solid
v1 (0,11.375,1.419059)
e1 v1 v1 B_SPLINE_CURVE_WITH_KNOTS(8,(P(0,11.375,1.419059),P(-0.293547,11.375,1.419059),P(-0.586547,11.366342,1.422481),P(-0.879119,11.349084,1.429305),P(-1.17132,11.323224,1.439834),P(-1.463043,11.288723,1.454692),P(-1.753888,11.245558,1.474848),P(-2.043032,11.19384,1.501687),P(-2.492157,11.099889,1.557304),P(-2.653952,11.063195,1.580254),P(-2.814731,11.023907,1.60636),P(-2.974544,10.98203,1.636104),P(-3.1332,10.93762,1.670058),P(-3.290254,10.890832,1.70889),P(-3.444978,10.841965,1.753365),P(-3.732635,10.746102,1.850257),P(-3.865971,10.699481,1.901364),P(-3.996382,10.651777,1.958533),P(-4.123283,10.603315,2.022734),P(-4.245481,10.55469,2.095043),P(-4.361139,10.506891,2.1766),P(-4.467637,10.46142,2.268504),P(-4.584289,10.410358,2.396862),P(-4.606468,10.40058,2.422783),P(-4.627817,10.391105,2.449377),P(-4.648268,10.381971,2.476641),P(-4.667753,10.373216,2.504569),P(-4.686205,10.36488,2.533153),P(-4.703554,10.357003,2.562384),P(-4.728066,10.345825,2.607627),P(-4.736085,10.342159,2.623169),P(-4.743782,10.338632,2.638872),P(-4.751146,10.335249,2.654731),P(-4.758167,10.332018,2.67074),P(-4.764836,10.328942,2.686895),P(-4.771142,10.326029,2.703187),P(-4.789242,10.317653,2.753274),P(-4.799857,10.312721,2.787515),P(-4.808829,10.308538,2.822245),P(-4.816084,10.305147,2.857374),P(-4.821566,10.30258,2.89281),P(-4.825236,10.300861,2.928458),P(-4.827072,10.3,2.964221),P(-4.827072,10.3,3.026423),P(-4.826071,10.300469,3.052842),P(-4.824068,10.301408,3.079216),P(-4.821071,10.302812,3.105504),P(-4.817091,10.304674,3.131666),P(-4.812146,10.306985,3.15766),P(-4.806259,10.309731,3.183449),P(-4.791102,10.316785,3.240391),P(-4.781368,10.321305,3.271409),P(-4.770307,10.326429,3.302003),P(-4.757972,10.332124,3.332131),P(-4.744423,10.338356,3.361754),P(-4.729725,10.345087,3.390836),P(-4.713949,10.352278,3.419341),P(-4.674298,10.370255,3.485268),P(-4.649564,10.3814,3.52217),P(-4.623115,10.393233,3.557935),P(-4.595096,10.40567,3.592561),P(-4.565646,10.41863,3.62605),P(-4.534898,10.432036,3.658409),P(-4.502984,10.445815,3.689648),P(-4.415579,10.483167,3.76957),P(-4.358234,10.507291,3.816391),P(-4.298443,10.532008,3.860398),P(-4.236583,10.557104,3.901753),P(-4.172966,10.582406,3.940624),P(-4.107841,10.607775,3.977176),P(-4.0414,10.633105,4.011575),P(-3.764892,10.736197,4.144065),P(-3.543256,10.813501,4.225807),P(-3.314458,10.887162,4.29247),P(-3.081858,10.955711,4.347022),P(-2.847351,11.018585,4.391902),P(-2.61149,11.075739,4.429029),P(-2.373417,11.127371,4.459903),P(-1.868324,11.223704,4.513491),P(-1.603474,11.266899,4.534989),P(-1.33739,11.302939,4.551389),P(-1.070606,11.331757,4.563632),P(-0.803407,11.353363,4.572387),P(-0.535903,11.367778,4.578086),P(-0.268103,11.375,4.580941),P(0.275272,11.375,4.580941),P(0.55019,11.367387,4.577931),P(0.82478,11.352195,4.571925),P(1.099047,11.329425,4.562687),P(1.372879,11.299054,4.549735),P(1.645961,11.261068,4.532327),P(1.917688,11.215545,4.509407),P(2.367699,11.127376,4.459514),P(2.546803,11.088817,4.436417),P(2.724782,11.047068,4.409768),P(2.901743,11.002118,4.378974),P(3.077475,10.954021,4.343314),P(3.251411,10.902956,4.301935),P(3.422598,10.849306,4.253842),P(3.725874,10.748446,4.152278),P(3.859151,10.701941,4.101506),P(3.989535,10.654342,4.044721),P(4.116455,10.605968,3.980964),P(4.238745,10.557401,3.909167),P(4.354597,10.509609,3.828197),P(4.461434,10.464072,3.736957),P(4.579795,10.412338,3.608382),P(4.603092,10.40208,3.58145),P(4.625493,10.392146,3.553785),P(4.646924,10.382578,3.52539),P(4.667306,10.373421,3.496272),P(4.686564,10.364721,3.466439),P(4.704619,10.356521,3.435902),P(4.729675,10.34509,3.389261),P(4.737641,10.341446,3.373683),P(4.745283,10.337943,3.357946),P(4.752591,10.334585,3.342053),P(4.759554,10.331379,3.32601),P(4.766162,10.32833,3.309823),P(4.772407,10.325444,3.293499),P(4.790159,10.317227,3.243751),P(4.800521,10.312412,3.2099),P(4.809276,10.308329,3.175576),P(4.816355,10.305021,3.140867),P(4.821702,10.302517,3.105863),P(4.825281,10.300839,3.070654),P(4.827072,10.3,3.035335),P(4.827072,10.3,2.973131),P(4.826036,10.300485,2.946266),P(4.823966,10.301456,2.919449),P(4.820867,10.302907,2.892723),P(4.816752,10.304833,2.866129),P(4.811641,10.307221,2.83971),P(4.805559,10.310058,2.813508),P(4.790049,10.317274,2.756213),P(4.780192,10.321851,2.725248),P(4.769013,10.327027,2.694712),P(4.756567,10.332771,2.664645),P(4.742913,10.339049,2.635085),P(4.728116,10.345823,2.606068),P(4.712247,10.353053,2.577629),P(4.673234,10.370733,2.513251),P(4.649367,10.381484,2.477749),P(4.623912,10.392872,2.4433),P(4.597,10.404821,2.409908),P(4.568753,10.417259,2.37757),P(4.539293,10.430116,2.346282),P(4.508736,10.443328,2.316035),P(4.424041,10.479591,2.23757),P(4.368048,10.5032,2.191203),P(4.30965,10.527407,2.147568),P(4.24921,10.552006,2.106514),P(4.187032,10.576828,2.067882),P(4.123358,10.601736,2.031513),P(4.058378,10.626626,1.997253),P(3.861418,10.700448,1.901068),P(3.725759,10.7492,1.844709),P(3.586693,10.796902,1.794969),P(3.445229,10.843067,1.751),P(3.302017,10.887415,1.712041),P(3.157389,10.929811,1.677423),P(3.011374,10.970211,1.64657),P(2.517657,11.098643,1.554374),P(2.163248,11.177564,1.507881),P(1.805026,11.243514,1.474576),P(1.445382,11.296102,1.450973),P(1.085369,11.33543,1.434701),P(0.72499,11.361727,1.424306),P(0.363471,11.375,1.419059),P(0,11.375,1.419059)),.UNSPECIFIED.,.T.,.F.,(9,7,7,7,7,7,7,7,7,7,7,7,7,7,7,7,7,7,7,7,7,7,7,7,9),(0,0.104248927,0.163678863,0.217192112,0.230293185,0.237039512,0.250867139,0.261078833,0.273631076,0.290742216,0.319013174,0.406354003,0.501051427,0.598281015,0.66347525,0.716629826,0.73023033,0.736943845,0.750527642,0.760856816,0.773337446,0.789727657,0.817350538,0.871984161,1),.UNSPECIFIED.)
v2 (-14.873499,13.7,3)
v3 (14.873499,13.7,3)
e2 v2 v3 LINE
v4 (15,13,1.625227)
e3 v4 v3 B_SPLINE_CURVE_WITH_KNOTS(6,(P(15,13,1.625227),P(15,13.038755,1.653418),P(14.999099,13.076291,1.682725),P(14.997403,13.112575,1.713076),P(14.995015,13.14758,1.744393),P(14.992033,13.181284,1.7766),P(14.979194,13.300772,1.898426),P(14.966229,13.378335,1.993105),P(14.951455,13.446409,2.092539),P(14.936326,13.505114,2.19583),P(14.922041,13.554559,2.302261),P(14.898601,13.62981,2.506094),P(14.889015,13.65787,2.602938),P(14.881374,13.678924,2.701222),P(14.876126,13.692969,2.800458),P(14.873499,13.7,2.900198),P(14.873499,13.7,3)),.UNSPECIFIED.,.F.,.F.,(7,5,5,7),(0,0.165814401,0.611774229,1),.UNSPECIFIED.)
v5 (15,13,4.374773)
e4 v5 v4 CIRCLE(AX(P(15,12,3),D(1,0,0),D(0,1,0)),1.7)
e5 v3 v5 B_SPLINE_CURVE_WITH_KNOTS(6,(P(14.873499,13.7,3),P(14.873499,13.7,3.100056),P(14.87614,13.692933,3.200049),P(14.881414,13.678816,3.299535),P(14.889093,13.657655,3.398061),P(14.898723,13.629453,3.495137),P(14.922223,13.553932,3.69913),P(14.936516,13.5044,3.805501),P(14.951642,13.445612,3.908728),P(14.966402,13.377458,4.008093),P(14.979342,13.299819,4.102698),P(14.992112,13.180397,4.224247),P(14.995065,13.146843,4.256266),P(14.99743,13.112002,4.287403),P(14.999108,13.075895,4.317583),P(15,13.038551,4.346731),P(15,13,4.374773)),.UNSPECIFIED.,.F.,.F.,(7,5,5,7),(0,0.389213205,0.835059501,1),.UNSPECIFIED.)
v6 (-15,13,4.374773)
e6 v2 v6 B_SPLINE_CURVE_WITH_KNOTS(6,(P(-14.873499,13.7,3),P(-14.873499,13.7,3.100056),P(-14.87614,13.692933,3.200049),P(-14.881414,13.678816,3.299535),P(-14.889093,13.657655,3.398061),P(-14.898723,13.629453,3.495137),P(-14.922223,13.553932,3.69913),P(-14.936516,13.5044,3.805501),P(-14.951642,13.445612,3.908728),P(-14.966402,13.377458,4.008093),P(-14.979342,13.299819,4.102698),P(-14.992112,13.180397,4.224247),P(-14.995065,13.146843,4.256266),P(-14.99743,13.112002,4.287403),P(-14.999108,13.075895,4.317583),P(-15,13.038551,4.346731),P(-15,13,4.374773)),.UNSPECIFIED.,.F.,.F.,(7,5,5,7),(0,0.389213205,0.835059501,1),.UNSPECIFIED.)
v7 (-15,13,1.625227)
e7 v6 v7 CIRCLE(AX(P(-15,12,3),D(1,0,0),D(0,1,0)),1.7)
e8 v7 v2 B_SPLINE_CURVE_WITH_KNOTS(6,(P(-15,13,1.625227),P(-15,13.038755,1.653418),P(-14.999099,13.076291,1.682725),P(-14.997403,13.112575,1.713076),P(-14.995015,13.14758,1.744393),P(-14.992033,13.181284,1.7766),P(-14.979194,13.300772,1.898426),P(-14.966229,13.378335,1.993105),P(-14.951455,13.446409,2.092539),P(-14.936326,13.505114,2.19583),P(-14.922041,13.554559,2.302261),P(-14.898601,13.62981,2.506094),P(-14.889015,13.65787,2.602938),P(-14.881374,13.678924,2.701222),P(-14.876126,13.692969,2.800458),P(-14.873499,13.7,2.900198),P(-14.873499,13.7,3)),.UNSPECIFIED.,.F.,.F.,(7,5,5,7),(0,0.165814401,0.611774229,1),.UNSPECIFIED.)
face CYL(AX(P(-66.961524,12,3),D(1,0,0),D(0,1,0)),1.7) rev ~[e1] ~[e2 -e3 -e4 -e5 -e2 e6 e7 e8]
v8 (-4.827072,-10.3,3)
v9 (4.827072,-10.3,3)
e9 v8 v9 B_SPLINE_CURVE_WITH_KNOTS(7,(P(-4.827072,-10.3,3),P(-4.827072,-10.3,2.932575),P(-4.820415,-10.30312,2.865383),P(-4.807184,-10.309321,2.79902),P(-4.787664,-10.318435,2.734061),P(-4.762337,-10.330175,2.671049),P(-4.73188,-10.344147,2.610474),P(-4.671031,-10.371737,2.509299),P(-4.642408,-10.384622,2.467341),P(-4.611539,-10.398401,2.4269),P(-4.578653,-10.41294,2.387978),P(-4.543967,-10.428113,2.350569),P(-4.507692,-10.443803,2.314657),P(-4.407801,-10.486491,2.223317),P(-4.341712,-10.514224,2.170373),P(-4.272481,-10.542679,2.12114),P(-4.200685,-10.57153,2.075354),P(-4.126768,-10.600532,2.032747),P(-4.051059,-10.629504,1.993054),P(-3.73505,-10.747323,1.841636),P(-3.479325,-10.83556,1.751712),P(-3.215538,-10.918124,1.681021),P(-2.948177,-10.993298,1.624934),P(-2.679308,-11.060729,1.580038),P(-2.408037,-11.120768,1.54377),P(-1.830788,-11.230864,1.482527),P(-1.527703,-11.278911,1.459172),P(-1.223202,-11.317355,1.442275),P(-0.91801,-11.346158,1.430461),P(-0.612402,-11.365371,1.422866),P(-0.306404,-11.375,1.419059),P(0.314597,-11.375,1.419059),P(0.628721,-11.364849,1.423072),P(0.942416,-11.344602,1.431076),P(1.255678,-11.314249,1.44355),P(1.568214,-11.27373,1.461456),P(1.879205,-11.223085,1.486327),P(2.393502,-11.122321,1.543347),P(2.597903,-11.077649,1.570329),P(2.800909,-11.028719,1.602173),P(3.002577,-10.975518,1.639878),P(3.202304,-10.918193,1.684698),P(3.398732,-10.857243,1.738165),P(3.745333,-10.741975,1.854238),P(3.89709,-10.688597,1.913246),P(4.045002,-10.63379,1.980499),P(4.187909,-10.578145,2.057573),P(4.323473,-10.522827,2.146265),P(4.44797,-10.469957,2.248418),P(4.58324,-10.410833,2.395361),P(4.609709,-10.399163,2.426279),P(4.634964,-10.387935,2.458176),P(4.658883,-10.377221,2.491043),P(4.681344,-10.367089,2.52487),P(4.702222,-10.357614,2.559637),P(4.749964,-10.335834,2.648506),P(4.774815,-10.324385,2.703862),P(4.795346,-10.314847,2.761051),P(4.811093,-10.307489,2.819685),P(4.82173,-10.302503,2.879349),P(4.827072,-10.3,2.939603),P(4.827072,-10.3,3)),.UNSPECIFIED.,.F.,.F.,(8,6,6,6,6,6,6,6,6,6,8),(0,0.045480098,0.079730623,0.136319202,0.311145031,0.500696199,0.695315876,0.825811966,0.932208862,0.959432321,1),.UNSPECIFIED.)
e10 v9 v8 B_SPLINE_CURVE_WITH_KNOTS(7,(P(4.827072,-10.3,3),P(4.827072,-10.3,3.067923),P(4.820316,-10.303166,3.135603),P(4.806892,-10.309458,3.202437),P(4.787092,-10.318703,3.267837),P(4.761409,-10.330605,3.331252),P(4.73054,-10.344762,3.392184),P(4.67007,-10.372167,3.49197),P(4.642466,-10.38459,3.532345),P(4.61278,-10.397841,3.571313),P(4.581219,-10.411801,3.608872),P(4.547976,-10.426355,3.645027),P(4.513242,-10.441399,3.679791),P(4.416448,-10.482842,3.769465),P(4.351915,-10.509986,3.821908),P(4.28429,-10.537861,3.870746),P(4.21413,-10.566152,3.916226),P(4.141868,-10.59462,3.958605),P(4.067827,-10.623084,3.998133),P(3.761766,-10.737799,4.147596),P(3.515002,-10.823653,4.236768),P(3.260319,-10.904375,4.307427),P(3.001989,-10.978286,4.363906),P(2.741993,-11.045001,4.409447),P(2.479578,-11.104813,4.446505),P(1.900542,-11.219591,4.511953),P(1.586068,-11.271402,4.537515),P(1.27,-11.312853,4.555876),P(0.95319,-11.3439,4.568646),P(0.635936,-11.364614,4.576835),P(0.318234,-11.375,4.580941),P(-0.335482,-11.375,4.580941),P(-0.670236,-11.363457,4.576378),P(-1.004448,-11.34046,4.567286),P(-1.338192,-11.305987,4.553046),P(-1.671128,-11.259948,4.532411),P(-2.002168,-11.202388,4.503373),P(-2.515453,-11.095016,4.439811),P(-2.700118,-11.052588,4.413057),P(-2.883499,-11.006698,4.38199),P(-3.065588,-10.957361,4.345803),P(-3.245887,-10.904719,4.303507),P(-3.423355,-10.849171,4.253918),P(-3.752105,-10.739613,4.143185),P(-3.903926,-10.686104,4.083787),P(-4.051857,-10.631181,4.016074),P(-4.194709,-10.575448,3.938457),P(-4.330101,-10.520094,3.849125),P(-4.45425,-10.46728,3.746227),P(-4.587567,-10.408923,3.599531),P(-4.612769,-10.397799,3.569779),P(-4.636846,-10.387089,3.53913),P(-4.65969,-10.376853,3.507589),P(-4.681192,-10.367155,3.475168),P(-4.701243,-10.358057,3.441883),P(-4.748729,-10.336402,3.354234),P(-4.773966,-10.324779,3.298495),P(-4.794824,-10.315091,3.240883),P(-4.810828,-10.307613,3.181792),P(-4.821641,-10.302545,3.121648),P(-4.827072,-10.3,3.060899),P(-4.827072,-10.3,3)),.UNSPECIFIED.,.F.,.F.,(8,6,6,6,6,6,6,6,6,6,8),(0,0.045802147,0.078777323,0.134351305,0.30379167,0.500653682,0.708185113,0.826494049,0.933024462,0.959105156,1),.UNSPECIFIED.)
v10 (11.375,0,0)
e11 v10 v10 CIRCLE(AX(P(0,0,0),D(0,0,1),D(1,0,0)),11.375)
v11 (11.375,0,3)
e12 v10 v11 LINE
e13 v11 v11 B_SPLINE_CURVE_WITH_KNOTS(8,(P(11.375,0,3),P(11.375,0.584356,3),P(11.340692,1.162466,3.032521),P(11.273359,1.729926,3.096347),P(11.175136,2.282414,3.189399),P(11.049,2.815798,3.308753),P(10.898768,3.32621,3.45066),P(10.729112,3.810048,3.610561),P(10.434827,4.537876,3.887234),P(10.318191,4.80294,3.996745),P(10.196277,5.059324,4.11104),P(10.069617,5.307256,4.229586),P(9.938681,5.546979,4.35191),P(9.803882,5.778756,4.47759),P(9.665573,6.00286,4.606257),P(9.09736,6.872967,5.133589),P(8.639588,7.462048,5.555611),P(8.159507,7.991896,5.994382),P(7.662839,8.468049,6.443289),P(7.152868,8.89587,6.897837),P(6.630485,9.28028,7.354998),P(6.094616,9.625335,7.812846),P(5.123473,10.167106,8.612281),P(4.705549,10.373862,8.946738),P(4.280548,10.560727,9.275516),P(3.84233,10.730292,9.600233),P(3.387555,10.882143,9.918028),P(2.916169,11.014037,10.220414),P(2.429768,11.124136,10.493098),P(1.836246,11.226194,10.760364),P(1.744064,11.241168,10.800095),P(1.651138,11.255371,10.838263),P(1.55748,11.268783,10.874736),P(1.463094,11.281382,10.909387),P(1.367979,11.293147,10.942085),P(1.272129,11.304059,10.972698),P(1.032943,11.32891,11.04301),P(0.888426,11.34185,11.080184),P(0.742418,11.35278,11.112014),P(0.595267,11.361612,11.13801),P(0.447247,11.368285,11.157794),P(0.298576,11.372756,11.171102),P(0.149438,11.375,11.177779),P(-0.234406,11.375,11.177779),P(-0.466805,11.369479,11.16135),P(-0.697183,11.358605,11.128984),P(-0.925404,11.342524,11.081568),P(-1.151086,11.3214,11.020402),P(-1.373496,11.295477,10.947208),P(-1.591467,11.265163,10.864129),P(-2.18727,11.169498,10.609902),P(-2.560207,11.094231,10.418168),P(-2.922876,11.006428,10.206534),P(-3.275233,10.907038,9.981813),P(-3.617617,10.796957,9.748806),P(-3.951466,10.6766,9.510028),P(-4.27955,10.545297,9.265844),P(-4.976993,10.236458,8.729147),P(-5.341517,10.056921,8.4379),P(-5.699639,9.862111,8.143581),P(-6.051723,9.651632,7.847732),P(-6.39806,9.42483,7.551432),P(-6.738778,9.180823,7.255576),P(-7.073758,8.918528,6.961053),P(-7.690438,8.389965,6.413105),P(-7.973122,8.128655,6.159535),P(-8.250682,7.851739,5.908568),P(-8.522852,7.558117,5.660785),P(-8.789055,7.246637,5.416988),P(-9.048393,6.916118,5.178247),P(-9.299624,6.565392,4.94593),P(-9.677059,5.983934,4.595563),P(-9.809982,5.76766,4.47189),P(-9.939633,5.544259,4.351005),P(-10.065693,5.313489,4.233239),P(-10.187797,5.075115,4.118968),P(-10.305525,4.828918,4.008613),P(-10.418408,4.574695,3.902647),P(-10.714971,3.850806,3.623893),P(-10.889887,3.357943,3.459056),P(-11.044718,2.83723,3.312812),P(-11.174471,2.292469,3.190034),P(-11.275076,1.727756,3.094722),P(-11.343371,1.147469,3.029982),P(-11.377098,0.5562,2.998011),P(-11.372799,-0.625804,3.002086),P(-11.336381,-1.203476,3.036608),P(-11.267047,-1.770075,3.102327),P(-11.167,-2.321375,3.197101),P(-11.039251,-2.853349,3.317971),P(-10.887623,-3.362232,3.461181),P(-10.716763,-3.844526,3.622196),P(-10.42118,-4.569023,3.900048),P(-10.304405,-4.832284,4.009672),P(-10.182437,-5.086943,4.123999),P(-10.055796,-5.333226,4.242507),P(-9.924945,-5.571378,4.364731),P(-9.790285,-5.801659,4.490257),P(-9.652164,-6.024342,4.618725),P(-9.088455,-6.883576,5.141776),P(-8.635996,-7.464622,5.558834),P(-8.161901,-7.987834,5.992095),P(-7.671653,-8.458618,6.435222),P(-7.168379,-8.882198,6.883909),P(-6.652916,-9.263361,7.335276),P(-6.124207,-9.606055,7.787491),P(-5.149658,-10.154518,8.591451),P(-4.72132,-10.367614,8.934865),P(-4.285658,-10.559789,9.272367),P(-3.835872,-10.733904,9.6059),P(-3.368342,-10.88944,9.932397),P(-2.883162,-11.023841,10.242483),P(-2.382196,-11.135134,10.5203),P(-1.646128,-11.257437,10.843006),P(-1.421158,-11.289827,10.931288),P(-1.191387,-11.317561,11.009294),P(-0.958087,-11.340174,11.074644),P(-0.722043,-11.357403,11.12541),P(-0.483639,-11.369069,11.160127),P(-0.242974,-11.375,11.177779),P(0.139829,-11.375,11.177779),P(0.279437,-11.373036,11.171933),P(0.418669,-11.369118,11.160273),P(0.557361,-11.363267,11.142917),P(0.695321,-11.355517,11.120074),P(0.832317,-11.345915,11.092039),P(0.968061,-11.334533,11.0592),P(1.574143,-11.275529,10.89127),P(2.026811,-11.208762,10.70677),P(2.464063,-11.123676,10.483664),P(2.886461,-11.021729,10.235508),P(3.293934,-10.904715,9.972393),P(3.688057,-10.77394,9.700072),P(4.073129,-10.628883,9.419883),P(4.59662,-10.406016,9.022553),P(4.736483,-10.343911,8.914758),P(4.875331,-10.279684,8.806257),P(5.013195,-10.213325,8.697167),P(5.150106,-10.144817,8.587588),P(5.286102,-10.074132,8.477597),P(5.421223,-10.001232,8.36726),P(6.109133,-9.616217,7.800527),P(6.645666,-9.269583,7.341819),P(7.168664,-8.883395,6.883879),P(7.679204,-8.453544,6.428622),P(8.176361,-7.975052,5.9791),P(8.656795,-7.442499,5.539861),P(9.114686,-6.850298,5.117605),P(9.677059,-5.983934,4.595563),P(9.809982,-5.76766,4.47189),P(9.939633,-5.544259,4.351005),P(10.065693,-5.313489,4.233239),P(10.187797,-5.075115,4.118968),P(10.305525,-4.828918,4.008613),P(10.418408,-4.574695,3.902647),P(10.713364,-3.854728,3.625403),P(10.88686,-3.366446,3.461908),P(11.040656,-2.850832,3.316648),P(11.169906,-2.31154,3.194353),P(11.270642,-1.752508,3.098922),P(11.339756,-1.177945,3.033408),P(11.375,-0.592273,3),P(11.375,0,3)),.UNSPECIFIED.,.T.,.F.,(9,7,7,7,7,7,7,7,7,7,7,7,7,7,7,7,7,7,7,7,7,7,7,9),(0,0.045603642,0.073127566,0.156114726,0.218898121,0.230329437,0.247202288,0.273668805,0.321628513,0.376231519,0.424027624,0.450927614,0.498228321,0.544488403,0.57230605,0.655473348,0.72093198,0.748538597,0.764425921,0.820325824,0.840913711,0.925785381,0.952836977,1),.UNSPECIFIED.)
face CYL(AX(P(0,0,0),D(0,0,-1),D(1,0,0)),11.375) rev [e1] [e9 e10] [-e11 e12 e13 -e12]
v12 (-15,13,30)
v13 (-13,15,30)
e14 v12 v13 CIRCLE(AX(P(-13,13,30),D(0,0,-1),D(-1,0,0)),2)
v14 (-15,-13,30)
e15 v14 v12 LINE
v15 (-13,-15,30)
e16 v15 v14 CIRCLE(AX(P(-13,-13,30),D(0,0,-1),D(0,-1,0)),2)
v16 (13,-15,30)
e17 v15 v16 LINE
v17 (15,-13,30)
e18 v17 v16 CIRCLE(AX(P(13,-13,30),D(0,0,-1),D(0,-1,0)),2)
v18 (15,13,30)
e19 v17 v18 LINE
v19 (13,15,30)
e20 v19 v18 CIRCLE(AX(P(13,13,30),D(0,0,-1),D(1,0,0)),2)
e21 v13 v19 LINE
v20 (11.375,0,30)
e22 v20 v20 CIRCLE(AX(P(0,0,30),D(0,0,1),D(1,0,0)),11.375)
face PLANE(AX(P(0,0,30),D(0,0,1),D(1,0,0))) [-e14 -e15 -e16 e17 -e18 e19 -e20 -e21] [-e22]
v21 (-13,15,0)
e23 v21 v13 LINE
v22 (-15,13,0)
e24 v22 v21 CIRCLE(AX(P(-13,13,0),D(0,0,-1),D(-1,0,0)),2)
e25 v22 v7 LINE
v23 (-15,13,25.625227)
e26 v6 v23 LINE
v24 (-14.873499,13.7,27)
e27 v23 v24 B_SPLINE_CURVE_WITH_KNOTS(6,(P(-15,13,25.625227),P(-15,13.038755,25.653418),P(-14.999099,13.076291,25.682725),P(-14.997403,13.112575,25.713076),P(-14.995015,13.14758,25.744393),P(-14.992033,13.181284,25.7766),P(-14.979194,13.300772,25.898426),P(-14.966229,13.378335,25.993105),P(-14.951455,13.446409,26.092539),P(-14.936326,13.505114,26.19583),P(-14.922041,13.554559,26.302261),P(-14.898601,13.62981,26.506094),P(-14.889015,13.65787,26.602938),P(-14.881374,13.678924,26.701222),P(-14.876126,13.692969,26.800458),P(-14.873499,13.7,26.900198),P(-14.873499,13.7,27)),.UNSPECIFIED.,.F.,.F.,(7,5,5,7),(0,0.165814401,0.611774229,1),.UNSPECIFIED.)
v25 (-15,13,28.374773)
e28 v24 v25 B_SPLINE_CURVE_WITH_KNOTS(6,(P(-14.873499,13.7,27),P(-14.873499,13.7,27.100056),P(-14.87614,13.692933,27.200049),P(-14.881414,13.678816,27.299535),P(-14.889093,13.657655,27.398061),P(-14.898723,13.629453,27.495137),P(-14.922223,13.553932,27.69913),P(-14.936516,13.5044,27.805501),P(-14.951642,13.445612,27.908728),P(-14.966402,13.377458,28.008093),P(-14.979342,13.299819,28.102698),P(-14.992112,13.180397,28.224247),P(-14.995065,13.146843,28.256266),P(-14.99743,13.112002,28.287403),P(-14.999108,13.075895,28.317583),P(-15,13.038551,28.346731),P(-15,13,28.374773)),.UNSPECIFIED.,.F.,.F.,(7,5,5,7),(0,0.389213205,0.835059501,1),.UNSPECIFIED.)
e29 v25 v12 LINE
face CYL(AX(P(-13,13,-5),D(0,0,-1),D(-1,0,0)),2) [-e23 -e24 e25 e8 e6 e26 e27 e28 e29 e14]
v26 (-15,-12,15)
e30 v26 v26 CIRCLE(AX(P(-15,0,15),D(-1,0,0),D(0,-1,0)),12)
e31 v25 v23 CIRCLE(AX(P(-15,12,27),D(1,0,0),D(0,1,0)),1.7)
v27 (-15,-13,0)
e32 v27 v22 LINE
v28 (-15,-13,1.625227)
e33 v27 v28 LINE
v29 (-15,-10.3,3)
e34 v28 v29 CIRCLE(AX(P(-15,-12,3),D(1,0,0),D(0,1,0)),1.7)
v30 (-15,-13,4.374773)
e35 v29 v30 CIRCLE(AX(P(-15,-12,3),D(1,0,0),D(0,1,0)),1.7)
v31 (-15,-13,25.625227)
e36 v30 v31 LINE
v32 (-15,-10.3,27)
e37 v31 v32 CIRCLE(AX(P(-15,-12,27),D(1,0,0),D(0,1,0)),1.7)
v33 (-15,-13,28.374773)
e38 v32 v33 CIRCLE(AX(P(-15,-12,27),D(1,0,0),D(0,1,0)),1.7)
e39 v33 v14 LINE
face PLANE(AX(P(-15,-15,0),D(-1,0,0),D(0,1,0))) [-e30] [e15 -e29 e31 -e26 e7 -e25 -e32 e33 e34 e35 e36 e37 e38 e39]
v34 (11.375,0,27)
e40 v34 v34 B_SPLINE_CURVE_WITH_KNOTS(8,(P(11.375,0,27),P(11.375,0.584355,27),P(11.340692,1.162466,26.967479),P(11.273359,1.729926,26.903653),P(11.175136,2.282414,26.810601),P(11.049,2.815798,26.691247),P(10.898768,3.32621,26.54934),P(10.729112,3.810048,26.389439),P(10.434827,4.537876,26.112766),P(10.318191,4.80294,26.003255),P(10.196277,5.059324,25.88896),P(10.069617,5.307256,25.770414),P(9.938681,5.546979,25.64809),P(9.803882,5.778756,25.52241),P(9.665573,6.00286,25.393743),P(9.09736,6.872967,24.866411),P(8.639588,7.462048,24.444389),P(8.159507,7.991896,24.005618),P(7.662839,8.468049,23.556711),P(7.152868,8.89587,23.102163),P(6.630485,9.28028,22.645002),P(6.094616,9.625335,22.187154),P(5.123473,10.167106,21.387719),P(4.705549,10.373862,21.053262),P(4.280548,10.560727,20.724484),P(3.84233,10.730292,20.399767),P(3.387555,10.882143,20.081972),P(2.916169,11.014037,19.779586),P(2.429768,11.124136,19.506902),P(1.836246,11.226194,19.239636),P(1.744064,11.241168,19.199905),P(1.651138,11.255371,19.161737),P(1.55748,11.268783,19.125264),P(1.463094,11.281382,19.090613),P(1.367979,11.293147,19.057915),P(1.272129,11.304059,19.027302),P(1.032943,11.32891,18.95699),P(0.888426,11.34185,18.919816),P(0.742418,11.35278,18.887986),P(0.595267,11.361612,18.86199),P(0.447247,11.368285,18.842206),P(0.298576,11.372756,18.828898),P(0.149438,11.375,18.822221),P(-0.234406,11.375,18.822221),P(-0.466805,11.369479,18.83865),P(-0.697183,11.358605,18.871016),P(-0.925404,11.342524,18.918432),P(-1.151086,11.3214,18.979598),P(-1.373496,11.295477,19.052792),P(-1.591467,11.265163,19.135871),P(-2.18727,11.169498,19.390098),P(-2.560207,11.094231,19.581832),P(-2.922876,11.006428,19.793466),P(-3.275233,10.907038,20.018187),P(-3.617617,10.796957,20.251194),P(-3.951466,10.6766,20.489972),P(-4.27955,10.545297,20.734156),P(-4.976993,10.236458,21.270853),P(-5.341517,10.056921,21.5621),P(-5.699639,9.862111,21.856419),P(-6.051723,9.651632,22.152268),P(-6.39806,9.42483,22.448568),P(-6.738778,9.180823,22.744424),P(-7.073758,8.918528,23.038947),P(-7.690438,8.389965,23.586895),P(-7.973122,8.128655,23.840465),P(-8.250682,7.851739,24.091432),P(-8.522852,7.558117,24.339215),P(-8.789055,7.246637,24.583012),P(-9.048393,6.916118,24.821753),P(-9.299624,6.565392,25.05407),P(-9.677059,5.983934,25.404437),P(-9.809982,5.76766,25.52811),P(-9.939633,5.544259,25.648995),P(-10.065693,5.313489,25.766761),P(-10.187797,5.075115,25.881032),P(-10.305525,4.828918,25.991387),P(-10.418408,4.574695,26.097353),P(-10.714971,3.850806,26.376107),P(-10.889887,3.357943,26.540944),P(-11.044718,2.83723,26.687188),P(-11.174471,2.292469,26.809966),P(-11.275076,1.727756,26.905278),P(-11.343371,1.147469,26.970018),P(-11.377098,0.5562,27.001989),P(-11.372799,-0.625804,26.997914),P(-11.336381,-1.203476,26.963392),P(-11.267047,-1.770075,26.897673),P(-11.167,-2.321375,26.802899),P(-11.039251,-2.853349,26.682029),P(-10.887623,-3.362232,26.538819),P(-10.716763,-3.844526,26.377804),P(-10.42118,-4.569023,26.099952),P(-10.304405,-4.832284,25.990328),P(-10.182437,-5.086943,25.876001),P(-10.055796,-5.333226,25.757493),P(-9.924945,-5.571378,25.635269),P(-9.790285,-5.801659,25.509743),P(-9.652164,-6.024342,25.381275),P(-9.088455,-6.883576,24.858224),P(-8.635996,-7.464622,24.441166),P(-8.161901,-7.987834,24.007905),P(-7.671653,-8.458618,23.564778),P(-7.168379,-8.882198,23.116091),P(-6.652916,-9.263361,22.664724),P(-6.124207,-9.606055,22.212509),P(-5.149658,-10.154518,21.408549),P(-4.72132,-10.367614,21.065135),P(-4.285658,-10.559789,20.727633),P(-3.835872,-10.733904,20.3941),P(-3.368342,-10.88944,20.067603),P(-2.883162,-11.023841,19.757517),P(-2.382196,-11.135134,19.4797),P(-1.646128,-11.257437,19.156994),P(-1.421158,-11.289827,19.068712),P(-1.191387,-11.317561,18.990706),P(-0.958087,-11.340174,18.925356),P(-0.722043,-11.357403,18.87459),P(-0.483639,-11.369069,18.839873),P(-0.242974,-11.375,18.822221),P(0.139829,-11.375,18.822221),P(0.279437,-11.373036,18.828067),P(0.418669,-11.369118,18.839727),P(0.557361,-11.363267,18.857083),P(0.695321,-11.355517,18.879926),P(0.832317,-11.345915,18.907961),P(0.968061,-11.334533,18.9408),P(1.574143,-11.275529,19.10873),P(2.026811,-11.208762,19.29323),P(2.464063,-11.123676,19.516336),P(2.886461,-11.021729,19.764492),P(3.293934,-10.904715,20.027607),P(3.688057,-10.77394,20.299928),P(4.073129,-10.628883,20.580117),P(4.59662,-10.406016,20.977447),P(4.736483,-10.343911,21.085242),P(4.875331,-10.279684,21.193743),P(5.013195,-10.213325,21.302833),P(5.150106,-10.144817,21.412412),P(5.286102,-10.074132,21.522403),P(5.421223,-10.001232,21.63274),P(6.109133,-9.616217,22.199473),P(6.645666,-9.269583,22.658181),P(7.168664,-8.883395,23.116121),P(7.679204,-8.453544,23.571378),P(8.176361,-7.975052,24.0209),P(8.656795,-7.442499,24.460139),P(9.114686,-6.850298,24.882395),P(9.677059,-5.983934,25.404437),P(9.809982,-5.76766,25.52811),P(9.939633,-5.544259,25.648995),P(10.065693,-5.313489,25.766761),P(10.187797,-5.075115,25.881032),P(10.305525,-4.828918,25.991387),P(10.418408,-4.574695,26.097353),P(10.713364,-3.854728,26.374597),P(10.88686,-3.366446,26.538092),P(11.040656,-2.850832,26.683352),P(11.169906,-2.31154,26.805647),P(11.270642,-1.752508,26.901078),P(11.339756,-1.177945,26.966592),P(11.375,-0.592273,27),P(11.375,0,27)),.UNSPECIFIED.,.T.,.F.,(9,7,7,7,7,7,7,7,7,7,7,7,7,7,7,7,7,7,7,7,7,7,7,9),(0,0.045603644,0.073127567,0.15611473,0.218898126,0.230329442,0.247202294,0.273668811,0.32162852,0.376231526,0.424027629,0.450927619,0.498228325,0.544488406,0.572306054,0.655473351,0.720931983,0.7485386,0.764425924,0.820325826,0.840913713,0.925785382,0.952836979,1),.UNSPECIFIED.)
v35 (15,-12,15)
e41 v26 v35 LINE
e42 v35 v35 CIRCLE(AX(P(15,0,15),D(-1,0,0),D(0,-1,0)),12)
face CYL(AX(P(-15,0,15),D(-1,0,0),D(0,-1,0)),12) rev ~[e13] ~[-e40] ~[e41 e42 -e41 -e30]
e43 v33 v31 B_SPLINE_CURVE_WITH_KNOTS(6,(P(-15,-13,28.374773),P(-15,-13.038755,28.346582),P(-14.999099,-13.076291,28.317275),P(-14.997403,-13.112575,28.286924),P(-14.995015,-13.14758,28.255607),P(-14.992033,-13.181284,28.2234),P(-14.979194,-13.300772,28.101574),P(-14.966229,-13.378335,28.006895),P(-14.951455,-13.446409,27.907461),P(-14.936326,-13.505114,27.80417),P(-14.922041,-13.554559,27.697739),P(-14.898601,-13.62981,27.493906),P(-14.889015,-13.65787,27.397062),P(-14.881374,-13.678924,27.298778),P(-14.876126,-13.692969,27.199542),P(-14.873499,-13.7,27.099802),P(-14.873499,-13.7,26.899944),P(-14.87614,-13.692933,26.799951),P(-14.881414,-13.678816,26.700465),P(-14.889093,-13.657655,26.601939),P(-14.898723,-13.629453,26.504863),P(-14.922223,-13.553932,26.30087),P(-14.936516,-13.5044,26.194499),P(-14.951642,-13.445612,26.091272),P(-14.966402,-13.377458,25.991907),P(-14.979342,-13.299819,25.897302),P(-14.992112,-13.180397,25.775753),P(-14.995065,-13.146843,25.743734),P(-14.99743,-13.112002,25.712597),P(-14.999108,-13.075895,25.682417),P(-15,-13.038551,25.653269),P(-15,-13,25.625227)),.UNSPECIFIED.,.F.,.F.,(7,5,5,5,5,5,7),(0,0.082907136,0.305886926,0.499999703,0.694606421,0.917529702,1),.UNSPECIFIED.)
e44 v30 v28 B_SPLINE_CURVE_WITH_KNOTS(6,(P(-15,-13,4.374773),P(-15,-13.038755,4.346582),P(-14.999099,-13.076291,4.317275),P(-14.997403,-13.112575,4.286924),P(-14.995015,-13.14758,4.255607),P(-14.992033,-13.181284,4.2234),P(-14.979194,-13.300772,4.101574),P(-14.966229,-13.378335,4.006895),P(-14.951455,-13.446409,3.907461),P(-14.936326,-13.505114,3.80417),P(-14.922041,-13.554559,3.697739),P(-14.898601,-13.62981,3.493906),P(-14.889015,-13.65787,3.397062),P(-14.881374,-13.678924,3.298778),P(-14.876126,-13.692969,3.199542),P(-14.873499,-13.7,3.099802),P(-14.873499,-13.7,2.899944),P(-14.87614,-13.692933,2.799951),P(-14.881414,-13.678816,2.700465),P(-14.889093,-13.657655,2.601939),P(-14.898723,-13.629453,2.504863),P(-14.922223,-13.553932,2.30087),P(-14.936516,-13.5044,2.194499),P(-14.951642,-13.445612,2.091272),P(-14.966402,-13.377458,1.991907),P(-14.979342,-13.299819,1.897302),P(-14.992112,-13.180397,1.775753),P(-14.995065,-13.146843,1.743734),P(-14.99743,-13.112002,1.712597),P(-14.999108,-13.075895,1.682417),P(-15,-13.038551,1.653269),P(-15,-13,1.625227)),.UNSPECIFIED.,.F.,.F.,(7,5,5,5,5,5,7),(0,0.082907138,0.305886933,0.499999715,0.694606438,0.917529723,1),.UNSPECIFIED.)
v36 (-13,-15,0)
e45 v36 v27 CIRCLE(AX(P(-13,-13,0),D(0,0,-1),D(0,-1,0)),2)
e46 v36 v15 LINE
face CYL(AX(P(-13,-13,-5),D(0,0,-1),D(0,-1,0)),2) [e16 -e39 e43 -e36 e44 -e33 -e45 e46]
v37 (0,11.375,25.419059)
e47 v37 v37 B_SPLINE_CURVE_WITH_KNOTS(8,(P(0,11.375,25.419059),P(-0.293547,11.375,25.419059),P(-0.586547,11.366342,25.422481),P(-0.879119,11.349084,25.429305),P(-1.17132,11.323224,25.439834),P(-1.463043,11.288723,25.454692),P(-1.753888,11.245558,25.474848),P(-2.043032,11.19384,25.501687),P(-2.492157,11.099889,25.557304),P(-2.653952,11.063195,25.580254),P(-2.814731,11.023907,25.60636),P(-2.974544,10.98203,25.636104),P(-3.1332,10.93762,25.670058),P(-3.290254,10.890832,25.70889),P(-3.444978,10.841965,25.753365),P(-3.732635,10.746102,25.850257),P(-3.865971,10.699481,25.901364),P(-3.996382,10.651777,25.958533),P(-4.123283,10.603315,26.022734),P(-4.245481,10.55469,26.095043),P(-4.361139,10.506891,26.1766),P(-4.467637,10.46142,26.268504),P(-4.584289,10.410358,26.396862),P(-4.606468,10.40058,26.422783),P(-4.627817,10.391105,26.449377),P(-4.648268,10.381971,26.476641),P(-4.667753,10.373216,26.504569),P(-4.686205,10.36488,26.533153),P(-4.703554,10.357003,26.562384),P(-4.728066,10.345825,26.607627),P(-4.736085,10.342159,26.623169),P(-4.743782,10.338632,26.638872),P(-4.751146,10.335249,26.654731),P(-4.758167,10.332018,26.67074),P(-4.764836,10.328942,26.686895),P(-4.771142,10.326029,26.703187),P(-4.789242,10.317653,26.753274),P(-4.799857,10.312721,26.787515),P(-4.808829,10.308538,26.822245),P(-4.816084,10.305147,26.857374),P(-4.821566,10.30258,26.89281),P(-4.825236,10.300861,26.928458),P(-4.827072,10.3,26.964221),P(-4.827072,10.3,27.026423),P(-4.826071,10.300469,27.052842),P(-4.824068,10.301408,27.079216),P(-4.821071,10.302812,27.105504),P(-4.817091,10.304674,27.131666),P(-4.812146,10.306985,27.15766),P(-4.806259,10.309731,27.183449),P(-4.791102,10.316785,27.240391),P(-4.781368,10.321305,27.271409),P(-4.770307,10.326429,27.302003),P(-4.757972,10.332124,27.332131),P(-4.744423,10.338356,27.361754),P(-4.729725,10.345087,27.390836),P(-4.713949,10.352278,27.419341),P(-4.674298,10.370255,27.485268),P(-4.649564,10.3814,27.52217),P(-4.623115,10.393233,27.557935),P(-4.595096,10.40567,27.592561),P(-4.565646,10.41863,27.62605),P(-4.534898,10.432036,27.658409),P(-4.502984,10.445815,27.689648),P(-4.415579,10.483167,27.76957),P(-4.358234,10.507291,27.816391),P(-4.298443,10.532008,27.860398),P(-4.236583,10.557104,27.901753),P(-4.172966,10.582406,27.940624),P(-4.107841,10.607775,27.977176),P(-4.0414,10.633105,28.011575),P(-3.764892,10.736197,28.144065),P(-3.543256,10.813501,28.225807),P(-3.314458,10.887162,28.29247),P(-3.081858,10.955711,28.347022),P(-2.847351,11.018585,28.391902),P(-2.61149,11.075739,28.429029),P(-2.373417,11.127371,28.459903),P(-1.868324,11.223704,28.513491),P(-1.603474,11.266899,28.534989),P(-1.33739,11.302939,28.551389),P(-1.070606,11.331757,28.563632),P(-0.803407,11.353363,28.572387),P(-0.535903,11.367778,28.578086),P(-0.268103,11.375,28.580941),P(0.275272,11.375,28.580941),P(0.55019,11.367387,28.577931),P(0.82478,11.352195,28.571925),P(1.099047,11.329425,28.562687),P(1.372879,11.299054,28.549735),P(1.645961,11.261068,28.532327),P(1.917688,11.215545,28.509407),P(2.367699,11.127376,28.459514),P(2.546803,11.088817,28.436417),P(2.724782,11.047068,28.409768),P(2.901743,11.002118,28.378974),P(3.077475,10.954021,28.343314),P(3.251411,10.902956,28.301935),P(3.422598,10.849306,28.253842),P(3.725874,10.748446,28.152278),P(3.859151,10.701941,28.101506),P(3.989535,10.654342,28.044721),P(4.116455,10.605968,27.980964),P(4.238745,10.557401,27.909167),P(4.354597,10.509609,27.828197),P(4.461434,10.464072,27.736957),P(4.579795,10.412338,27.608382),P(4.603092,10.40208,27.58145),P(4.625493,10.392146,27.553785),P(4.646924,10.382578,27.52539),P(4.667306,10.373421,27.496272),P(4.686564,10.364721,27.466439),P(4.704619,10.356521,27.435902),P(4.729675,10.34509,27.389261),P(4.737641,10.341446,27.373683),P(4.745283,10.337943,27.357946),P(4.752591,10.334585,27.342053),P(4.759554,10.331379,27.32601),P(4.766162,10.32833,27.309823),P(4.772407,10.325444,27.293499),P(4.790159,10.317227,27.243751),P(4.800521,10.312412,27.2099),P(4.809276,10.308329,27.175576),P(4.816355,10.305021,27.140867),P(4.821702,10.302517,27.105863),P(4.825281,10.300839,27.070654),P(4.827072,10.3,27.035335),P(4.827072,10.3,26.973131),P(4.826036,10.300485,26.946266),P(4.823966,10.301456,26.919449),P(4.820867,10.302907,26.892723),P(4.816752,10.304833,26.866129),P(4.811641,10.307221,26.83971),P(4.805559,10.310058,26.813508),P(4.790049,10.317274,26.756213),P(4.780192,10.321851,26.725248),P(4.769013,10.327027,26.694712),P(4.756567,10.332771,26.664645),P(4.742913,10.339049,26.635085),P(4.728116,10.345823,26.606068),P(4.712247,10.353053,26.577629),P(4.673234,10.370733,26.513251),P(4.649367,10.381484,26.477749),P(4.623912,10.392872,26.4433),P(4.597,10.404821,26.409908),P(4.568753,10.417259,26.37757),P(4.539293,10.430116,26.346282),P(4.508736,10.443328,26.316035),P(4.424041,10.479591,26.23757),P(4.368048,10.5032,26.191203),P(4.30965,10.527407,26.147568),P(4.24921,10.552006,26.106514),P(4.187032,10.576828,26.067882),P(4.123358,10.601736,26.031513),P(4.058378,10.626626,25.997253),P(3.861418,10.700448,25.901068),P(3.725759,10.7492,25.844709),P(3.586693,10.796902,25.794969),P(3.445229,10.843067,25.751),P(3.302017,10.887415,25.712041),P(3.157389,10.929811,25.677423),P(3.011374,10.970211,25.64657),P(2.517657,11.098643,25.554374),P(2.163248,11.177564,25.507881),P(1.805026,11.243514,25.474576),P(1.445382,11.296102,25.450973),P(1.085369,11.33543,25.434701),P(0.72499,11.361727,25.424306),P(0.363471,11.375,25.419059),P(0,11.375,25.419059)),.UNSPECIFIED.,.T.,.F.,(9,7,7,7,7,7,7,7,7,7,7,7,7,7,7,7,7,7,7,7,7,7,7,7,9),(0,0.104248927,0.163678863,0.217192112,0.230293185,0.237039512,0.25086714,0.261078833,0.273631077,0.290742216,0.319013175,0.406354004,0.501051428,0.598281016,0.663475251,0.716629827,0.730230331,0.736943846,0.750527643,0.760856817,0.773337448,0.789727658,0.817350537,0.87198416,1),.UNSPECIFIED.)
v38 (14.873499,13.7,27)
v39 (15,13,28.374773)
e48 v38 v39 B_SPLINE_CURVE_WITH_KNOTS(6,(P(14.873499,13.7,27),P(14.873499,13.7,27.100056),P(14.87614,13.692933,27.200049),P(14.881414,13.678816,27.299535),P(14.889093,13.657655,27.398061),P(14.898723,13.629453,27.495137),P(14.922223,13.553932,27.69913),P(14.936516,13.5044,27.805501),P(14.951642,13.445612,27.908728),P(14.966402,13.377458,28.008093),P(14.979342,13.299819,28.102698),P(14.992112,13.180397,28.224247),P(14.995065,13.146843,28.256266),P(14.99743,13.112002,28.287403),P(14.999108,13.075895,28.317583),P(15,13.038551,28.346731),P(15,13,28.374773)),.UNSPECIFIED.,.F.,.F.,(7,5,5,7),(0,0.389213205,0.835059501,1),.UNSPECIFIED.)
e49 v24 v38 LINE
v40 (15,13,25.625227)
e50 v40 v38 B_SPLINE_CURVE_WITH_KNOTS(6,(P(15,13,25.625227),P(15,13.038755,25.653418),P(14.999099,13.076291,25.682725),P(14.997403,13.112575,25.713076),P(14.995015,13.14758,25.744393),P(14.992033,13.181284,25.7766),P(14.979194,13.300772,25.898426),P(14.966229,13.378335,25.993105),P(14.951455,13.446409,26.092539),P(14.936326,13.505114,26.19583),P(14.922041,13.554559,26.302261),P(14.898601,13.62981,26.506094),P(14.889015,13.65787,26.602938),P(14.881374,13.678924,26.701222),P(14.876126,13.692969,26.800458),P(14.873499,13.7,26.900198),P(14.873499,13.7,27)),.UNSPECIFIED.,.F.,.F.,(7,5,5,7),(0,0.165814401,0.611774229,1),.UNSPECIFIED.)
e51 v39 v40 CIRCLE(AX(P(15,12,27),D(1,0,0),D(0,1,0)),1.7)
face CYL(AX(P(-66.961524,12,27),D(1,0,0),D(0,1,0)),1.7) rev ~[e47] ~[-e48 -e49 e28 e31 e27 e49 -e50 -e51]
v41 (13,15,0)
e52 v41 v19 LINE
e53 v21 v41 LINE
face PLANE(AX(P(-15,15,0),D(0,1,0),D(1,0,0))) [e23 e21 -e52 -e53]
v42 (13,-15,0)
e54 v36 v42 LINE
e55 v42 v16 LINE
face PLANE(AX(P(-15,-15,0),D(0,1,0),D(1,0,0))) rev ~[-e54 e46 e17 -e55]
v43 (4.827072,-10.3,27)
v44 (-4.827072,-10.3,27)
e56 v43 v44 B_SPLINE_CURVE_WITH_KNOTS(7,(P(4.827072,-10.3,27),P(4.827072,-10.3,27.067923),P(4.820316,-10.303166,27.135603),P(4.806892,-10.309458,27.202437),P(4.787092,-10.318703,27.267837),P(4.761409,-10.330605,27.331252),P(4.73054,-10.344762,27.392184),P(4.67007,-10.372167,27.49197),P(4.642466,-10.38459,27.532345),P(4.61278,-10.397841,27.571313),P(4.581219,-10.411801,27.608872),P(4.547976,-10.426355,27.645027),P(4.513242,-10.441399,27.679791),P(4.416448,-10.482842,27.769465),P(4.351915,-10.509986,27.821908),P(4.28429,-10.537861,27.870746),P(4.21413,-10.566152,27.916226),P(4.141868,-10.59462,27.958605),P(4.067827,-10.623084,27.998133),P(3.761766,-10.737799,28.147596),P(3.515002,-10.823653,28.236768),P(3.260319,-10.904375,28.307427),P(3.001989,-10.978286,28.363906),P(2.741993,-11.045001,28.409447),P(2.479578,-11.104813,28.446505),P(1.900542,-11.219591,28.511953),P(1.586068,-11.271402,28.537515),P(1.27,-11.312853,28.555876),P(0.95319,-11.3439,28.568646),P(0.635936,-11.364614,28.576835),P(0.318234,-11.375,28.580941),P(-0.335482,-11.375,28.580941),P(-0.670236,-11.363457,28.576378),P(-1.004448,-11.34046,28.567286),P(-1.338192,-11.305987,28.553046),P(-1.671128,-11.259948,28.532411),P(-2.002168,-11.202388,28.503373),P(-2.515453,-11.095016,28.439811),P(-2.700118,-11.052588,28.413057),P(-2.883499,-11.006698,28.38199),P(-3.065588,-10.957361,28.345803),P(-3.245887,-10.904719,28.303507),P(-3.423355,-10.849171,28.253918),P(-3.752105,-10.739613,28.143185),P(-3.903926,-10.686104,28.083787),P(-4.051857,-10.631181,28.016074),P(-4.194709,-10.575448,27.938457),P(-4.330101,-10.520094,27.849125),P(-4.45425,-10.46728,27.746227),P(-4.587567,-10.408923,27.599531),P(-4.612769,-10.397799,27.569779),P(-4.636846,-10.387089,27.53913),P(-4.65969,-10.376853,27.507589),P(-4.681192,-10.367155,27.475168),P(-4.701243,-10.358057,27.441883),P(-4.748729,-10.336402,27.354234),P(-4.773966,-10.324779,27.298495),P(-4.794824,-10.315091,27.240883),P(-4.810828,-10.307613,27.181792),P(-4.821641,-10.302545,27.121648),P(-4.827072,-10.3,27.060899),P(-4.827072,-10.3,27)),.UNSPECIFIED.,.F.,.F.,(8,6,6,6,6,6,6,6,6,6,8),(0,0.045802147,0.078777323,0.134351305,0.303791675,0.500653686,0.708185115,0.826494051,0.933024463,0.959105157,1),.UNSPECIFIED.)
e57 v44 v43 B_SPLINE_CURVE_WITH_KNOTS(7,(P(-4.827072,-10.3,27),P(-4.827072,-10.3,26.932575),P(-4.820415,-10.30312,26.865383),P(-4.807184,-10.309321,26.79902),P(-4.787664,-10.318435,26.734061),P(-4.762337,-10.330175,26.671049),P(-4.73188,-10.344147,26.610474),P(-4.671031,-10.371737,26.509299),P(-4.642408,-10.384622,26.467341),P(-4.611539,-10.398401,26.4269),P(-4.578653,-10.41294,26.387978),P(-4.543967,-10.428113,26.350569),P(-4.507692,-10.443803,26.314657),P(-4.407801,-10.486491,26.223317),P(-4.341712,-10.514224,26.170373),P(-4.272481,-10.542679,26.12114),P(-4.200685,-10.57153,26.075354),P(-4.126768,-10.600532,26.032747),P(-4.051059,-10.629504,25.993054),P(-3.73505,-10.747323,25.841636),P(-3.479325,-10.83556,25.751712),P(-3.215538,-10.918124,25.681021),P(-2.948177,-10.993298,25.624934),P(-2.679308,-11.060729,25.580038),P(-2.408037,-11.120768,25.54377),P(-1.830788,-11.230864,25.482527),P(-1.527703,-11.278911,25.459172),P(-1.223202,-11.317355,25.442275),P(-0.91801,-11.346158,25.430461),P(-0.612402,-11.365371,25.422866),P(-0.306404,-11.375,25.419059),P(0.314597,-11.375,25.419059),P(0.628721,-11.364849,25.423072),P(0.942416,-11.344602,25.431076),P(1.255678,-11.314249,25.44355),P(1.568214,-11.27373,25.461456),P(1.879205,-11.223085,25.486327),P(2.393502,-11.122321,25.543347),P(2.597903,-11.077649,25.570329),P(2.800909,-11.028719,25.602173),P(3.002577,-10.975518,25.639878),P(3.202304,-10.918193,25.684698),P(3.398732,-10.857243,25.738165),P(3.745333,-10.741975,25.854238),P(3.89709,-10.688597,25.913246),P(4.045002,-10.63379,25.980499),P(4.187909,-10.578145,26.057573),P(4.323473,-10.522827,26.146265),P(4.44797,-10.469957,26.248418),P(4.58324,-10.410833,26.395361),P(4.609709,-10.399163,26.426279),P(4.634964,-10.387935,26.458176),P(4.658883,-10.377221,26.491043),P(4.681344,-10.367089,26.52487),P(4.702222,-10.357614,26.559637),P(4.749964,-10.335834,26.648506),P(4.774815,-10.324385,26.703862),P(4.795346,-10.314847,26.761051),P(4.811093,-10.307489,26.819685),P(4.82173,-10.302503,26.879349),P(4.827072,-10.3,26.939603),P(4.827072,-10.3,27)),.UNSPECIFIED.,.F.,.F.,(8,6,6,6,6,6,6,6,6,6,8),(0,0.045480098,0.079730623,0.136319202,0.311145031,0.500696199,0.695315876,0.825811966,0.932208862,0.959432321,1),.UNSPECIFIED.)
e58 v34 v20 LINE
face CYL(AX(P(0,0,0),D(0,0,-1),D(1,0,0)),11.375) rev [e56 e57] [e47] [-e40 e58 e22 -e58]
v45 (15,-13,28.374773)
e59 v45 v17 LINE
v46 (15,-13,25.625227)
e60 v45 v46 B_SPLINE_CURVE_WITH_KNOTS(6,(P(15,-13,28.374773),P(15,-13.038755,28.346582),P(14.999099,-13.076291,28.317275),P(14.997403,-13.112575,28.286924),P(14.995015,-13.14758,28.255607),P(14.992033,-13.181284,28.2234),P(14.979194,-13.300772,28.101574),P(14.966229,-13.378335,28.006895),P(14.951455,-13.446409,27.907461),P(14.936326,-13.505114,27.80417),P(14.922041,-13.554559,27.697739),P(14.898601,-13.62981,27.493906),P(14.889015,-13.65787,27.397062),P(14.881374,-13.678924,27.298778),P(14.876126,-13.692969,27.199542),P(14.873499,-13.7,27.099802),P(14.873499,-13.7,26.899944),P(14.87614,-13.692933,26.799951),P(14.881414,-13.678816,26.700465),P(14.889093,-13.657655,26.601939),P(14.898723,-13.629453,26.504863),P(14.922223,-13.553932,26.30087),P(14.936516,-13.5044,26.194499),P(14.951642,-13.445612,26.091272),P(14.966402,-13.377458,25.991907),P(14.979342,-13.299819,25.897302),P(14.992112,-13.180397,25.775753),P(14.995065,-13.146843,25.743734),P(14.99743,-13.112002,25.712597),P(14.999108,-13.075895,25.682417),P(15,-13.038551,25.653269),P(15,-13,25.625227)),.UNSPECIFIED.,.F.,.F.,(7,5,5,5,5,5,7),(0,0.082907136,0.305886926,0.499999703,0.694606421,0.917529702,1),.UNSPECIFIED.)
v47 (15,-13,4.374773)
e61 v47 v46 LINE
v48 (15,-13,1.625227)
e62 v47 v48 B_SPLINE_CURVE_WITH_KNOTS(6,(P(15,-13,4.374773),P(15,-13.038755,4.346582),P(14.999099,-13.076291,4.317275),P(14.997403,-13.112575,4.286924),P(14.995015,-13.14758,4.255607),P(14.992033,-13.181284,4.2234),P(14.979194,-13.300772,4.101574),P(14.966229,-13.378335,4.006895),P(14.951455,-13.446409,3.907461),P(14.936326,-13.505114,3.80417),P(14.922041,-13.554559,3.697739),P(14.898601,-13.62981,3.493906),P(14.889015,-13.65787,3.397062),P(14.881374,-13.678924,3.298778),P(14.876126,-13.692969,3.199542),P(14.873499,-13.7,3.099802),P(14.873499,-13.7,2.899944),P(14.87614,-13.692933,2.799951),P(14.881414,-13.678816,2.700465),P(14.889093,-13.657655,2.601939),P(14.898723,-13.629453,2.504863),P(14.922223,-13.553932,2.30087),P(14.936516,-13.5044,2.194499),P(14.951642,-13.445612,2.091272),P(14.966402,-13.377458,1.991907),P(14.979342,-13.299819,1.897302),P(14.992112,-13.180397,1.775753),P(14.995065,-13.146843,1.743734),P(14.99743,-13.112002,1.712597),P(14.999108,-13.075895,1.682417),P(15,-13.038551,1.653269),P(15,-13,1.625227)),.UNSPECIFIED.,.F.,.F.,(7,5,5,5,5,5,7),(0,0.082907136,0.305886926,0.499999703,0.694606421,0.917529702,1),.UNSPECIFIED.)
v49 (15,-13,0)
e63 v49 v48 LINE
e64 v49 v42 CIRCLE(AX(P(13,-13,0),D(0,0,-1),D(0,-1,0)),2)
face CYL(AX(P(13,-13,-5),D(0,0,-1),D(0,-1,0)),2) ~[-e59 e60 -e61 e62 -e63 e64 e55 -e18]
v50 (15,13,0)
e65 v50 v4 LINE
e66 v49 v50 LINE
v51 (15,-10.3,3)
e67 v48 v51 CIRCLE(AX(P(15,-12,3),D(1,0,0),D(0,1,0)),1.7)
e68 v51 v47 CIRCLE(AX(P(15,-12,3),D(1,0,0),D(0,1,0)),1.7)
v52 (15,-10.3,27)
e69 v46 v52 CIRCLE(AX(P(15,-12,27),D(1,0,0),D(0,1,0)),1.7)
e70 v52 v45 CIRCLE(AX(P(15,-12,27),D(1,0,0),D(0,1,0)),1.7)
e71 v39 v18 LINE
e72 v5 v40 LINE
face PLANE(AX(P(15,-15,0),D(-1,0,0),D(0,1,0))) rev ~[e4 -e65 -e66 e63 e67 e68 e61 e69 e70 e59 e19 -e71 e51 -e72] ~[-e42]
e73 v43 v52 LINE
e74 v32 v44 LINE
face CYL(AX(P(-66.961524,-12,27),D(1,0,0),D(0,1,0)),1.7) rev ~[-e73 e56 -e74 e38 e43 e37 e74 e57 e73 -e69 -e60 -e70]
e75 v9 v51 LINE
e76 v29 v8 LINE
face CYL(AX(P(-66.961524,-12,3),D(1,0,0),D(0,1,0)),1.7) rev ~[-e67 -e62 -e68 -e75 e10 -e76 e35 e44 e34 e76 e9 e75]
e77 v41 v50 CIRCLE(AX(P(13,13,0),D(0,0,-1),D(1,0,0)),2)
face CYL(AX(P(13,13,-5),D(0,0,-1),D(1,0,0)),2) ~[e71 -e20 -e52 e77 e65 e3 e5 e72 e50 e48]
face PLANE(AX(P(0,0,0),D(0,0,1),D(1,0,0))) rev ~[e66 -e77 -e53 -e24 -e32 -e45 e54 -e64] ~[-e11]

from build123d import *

# Parameters (mm, degrees)
F0_W        = 30
F0_H        = 30
F0_R        = 11.375
F1_DEPTH    = 30
F3_D        = 3.4
F4_T1_DEPTH = 40
F2_R        = 12
F5_DEPTH    = 30.0010001


# Not quite as in the source:
# - a fillet or chamfer that OpenCascade refuses, or shapes differently, is made with other operations: its cross-section is extruded or revolved along the edge and cut away or added


with BuildPart() as f1:
    # F0 (on Top) → F1 (new body)
    with BuildSketch(Plane.XY):
        Rectangle(F0_W, F0_H)
        Circle(F0_R, mode=Mode.SUBTRACT)
    extrude(amount=F1_DEPTH)

    # F3 (through all)
    with Locations(Plane(origin=(-15, 0, 0), x_dir=(0, -1, 0), z_dir=(-1, 0, 0))):
        with Locations((-12, 27), (12, 27), (12, 3), (-12, 3)):
            Hole(F3_D / 2)

    # F4: fillet of radius 2 on 4 edges, made by hand

    # F4_s2 → F4_t1 (cut)
    with BuildSketch(Plane.XY.offset(-5)):
        with BuildLine():
            ThreePointArc((15, 13), (14.4142135624, 14.4142135624), (13, 15))
            Line((13, 15), (15, 15))
            Line((15, 15), (15, 13))
        make_face()
        with BuildLine():
            ThreePointArc((-15, 13), (-14.4142135624, 14.4142135624), (-13, 15))
            Line((-13, 15), (-15, 15))
            Line((-15, 15), (-15, 13))
        make_face()
        with BuildLine():
            ThreePointArc((-13, -15), (-14.4142135624, -14.4142135624), (-15, -13))
            Line((-15, -13), (-15, -15))
            Line((-15, -15), (-13, -15))
        make_face()
        with BuildLine():
            ThreePointArc((13, -15), (14.4142135624, -14.4142135624), (15, -13))
            Line((15, -13), (15, -15))
            Line((15, -15), (13, -15))
        make_face()
    extrude(amount=F4_T1_DEPTH, mode=Mode.SUBTRACT)

    # F2 (on face) → F5 (cut, through all)
    with BuildSketch(Plane(origin=(-15, 0, 0), x_dir=(0, -1, 0), z_dir=(-1, 0, 0))):
        with Locations((0, 15)):
            Circle(F2_R)
    extrude(amount=-F5_DEPTH, mode=Mode.SUBTRACT)


solid = f1.part
